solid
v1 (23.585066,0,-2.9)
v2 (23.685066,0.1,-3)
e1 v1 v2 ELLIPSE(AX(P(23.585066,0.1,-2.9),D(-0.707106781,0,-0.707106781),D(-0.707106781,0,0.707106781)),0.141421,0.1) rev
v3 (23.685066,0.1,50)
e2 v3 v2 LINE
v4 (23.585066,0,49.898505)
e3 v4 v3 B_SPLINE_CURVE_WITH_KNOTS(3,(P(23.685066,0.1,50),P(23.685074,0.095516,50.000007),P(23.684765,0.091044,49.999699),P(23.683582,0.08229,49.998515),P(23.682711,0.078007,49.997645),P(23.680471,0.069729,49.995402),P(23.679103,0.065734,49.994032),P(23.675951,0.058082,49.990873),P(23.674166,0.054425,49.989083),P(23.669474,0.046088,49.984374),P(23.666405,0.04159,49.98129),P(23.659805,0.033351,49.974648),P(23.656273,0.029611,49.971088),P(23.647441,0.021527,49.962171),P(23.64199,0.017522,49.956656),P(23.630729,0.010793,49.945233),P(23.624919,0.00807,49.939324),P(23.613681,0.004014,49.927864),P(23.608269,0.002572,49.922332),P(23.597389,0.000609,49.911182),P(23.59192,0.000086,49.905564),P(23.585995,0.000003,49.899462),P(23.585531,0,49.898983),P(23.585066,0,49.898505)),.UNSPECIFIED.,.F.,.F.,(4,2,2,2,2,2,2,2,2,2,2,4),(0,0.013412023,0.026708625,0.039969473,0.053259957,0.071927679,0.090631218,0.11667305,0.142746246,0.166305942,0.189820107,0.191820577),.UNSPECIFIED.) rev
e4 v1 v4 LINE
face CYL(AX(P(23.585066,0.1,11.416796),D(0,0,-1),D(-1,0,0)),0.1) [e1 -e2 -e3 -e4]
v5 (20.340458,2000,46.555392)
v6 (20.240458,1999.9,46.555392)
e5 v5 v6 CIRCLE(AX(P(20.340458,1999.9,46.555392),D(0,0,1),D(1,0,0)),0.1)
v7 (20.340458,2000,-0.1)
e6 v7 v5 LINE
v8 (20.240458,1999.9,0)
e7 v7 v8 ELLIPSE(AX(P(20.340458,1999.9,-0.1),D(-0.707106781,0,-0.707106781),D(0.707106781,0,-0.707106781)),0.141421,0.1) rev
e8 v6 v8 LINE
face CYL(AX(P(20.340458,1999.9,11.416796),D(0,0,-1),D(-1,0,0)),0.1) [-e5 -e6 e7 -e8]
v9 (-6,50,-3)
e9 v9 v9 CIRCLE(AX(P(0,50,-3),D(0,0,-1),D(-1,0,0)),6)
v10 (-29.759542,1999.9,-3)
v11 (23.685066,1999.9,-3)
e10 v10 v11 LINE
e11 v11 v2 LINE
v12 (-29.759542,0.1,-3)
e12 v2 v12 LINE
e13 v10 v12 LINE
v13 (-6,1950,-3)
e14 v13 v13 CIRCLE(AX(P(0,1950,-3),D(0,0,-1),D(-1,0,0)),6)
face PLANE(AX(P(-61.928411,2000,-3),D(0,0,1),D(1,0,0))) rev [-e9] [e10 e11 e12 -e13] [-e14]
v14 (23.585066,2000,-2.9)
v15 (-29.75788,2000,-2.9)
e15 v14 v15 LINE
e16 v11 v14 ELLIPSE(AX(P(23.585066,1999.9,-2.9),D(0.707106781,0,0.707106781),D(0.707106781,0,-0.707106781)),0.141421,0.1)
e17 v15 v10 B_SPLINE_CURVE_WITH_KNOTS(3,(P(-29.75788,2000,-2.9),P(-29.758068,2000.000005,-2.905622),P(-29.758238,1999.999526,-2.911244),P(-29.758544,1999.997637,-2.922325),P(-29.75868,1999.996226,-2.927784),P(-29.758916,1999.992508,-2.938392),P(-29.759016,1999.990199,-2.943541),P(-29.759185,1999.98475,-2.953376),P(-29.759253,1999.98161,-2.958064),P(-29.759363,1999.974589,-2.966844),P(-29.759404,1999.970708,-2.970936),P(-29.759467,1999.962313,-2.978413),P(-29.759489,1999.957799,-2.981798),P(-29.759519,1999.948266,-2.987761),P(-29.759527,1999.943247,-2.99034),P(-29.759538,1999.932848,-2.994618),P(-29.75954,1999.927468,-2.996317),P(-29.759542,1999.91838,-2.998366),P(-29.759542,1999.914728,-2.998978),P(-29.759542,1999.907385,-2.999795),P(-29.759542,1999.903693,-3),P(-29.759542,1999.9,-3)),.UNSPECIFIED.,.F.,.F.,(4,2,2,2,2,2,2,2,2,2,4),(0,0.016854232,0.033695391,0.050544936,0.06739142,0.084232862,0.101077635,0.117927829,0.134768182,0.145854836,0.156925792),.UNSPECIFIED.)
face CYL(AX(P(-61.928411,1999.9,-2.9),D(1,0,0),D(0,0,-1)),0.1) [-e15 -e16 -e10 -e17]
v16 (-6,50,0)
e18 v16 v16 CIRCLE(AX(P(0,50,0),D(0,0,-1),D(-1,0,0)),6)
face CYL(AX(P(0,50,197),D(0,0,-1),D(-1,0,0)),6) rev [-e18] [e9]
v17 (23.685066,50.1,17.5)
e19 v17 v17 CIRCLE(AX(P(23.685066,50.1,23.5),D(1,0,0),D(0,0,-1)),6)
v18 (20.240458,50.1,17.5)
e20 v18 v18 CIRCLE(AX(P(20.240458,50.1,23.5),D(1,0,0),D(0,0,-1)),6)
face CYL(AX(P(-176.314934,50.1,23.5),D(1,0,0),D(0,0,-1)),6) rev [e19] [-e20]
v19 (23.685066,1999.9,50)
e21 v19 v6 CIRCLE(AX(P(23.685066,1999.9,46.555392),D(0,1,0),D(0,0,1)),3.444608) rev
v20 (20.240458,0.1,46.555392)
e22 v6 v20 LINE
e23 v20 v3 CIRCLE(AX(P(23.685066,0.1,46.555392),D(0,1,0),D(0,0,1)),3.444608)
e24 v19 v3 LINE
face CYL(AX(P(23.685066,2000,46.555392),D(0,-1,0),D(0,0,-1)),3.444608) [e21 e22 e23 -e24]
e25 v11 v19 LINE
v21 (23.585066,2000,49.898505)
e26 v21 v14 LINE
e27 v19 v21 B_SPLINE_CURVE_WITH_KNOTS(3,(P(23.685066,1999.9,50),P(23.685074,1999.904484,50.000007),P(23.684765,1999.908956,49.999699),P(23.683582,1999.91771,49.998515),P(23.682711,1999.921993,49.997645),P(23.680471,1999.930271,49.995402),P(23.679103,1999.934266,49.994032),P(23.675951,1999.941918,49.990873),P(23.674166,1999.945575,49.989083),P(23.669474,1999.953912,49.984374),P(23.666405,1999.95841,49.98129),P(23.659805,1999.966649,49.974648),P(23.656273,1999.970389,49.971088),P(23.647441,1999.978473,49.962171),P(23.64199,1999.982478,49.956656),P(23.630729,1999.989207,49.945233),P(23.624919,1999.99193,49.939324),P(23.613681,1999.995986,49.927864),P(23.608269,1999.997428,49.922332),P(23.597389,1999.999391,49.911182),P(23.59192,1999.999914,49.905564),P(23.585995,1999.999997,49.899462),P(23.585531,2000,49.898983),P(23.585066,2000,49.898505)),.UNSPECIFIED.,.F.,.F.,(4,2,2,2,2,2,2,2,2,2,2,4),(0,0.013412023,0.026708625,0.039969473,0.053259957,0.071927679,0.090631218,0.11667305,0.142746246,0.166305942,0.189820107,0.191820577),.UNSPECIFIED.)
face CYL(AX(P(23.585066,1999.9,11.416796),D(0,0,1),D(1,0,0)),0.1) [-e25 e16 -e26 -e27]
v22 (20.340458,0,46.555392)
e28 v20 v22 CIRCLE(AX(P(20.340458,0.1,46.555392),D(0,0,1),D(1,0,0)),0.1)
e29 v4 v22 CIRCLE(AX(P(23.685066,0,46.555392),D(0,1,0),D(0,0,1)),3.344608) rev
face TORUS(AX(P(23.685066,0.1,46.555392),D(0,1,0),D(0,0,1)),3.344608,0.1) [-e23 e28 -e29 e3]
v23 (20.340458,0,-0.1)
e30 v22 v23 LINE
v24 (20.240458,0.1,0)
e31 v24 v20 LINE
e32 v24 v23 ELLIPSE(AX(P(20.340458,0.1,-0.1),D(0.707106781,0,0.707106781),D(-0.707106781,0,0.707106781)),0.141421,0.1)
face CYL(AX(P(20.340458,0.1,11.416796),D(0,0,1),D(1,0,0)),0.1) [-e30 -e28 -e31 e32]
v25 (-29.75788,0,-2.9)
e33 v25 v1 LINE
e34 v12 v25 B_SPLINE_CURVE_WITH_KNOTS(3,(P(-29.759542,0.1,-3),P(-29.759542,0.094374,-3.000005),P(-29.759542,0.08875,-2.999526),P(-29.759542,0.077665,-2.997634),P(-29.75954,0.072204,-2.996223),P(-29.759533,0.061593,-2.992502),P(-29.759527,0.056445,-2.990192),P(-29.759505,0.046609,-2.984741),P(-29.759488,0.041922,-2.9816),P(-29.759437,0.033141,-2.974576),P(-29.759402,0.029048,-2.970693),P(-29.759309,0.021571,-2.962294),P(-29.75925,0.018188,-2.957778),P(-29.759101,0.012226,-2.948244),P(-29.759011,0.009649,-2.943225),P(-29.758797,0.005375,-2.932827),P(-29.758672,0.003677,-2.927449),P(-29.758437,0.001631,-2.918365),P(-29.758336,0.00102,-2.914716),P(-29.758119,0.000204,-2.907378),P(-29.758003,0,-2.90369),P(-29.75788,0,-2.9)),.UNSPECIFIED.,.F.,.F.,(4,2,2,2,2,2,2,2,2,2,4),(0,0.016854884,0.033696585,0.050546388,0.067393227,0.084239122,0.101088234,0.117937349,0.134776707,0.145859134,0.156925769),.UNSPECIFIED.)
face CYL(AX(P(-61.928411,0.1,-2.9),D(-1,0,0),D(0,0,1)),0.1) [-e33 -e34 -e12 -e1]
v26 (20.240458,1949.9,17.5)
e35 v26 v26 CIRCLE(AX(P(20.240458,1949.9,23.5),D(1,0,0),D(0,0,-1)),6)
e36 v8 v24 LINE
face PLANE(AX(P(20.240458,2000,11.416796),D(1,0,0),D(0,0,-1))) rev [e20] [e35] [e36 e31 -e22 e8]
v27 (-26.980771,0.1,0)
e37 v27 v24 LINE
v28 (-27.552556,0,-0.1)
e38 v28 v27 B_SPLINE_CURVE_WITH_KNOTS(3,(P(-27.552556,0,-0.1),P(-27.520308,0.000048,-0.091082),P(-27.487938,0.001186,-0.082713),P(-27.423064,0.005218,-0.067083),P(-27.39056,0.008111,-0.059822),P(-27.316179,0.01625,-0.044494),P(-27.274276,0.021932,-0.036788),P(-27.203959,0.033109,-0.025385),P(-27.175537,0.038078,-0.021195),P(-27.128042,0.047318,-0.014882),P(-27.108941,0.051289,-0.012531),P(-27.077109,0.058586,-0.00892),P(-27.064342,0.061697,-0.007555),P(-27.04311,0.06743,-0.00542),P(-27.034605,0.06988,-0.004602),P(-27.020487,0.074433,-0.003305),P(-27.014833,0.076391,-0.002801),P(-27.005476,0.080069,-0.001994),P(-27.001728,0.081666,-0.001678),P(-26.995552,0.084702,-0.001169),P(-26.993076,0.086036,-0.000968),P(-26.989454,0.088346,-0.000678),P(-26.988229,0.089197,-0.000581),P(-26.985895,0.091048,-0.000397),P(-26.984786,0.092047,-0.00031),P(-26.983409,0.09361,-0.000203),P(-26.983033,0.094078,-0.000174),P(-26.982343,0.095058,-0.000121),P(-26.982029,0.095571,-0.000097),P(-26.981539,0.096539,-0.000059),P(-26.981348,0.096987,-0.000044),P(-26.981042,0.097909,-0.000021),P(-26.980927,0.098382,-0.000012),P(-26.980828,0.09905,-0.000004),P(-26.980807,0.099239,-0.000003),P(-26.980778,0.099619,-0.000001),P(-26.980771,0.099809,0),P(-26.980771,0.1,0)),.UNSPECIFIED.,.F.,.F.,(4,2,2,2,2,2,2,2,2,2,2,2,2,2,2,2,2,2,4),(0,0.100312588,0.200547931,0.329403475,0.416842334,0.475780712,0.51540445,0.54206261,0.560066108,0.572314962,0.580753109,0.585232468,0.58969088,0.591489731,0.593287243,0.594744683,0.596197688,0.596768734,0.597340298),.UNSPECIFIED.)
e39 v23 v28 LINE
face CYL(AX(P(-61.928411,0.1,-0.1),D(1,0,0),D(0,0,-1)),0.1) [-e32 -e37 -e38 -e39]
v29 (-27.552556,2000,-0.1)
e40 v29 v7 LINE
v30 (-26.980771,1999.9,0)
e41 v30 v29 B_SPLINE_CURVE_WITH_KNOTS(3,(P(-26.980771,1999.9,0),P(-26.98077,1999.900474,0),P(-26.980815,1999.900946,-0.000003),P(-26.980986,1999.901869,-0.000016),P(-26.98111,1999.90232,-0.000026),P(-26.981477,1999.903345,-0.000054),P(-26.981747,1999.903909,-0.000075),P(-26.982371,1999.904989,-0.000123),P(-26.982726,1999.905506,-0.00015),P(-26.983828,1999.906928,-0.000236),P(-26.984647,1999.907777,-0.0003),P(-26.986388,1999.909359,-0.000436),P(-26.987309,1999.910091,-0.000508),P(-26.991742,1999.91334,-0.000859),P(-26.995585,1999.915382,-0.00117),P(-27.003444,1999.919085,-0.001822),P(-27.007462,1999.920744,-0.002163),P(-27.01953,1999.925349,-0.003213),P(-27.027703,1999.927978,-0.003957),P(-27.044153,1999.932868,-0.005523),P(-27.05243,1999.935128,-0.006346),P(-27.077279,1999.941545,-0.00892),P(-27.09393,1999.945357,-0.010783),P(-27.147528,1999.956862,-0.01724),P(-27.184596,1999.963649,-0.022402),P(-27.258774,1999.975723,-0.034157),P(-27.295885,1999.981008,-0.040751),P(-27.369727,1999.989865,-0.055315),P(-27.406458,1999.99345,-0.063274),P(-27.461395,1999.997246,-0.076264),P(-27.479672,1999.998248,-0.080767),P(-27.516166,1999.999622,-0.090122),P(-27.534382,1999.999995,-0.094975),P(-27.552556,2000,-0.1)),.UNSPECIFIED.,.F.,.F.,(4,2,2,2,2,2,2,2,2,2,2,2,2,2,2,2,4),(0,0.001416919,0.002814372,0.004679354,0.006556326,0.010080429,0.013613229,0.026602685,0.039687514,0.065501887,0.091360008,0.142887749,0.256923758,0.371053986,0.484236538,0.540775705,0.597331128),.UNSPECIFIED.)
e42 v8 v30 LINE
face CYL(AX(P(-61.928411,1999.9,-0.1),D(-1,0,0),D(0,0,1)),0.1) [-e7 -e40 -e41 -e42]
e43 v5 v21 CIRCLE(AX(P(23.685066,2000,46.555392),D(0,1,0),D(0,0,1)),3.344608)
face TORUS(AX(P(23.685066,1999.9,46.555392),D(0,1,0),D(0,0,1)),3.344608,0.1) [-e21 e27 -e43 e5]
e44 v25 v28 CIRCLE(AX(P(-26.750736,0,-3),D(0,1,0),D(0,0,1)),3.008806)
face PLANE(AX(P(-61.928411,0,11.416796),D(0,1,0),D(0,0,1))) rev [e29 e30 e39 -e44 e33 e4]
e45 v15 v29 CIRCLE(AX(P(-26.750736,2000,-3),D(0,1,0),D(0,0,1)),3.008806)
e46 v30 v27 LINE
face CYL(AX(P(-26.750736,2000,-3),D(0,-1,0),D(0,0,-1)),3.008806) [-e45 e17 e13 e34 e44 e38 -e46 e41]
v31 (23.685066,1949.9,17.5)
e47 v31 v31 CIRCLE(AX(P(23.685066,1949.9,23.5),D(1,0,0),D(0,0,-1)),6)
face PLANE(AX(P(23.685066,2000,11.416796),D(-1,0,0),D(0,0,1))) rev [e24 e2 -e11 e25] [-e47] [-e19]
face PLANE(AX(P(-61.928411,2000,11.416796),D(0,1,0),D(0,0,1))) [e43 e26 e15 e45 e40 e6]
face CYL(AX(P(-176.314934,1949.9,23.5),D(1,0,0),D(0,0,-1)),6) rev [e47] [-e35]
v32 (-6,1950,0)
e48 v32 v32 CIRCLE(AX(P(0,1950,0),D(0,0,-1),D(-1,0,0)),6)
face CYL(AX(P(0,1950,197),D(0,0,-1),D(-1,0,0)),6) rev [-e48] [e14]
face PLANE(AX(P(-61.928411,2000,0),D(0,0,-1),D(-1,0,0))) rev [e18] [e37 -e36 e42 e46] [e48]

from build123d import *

# Parameters (mm, degrees)
EXTRUDE_1_DEPTH        = 2000
FILLET_1_R             = 0.1
SKETCH_2_R             = 6
CUT_EXTRUDE_1_DEPTH    = 200
SKETCH_5_R             = 6
CUT_EXTRUDE_2_DEPTH    = 200
PATTERN_LINEAR_1_COUNT = 2
PATTERN_LINEAR_1_PITCH = 1900


with BuildPart() as part:
    # 草图1 → 凸台-拉伸1 (new body)
    with BuildSketch(Plane(origin=(0, 0, 0), x_dir=(1, 0, 0), z_dir=(0, 1, 0))):
        with BuildLine():
            ThreePointArc((-29.759542218, 3), (-28.958115236, 0.95539927), (-26.980771162, 0))
            Line((-26.980771162, 0), (-26.520700364, 0))
            Line((-26.520700364, 0), (20.240457782, 0))
            Line((20.240457782, 0), (20.240457782, -46.555391571))
            ThreePointArc((20.240457782, -46.555391571), (21.249360232, -48.99109755), (23.68506621, -50))
            Line((23.68506621, -50), (23.68506621, 3))
            Line((23.68506621, 3), (-29.759542218, 3))
        make_face()
    extrude(amount=EXTRUDE_1_DEPTH)

    # 圆角1
    # the kernel refuses this fillet: 0.1 mm, written as the material it takes off along each edge
    with BuildSketch(Plane(origin=(24.28506621, 2000, -3), x_dir=(0, 0, 1), z_dir=(-1, 0, 0))) as fillet_1_piece_1:
        with BuildLine():
            CenterArc((FILLET_1_R, -FILLET_1_R), FILLET_1_R, 90, 90)
            Line((0, -FILLET_1_R), (-FILLET_1_R * 0.02, -FILLET_1_R))
            Line((-FILLET_1_R * 0.02, -FILLET_1_R), (-FILLET_1_R * 0.02, FILLET_1_R * 0.0199999999995))
            Line((-FILLET_1_R * 0.02, FILLET_1_R * 0.0199999999995), (FILLET_1_R, FILLET_1_R * 0.0199999999995))
            Line((FILLET_1_R, FILLET_1_R * 0.0199999999995), (FILLET_1_R, 0))
        make_face()
    extrude(amount=54.644608429, mode=Mode.SUBTRACT)
    with BuildSketch(Plane(origin=(20.240457782, 2000, 0), x_dir=(0, 0, -1), z_dir=(-1, 0, 0)), Plane(origin=(-27.580771162, 0, 0), x_dir=(0, 0, -1), z_dir=(1, 0, 0))) as fillet_1_piece_2:
        with BuildLine():
            CenterArc((FILLET_1_R, FILLET_1_R), FILLET_1_R, 180, 90)
            Line((0, FILLET_1_R), (-FILLET_1_R * 0.02, FILLET_1_R))
            Line((-FILLET_1_R * 0.02, FILLET_1_R), (-FILLET_1_R * 0.02, -FILLET_1_R * 0.0199999999995))
            Line((-FILLET_1_R * 0.02, -FILLET_1_R * 0.0199999999995), (FILLET_1_R, -FILLET_1_R * 0.0199999999995))
            Line((FILLET_1_R, -FILLET_1_R * 0.0199999999995), (FILLET_1_R, 0))
        make_face()
    extrude(amount=47.821228944, mode=Mode.SUBTRACT)
    with BuildSketch(Plane(origin=(20.240457782, 2000, 0), x_dir=(1, 0, 0), z_dir=(0, 0, 1)), Plane(origin=(20.240457782, 0, 0), x_dir=(0, 1, 0), z_dir=(0, 0, 1))) as fillet_1_piece_3:
        with BuildLine():
            CenterArc((FILLET_1_R, -FILLET_1_R), FILLET_1_R, 90, 90)
            Line((0, -FILLET_1_R), (-FILLET_1_R * 0.02, -FILLET_1_R))
            Line((-FILLET_1_R * 0.02, -FILLET_1_R), (-FILLET_1_R * 0.02, FILLET_1_R * 0.0199999999995))
            Line((-FILLET_1_R * 0.02, FILLET_1_R * 0.0199999999995), (FILLET_1_R, FILLET_1_R * 0.0199999999995))
            Line((FILLET_1_R, FILLET_1_R * 0.0199999999995), (FILLET_1_R, 0))
        make_face()
    extrude(amount=46.555391571, mode=Mode.SUBTRACT)
    with BuildSketch(Plane(origin=(23.68506621, 2000, 46.555391571), x_dir=(-1, 0, 0), z_dir=(0, 0, -1))) as fillet_1_piece_4:
        with BuildLine():
            CenterArc((3.444608429 - FILLET_1_R, -FILLET_1_R), FILLET_1_R, 0, 90)
            Line((3.444608429, -FILLET_1_R), (3.444608429 + FILLET_1_R * 0.02, -FILLET_1_R))
            Line((3.444608429 + FILLET_1_R * 0.02, -FILLET_1_R), (3.444608429 + FILLET_1_R * 0.02, FILLET_1_R * 0.0199999999995))
            Line((3.444608429 + FILLET_1_R * 0.02, FILLET_1_R * 0.0199999999995), (3.444608429 - FILLET_1_R, FILLET_1_R * 0.0199999999995))
            Line((3.444608429 - FILLET_1_R, FILLET_1_R * 0.0199999999995), (3.444608429 - FILLET_1_R, 0))
        make_face()
    revolve(axis=Axis((23.68506621, 2000, 46.555391571), (0, 1, 0)), revolution_arc=99.984089086, mode=Mode.SUBTRACT)
    with BuildSketch(Plane(origin=(24.28506621, 0, -3), x_dir=(0, 0, 1), z_dir=(-1, 0, 0))) as fillet_1_piece_5:
        with BuildLine():
            CenterArc((FILLET_1_R, FILLET_1_R), FILLET_1_R, 180, 90)
            Line((0, FILLET_1_R), (-FILLET_1_R * 0.02, FILLET_1_R))
            Line((-FILLET_1_R * 0.02, FILLET_1_R), (-FILLET_1_R * 0.02, -FILLET_1_R * 0.02))
            Line((-FILLET_1_R * 0.02, -FILLET_1_R * 0.02), (FILLET_1_R, -FILLET_1_R * 0.02))
            Line((FILLET_1_R, -FILLET_1_R * 0.02), (FILLET_1_R, 0))
        make_face()
    extrude(amount=54.644608429, mode=Mode.SUBTRACT)
    with BuildSketch(Plane(origin=(23.68506621, 2000, 50.6), x_dir=(-1, 0, 0), z_dir=(0, 0, -1)), Plane(origin=(23.68506621, 0, 50.6), x_dir=(0, 1, 0), z_dir=(0, 0, -1))) as fillet_1_piece_6:
        with BuildLine():
            CenterArc((FILLET_1_R, -FILLET_1_R), FILLET_1_R, 90, 90)
            Line((0, -FILLET_1_R), (-FILLET_1_R * 0.02, -FILLET_1_R))
            Line((-FILLET_1_R * 0.02, -FILLET_1_R), (-FILLET_1_R * 0.02, FILLET_1_R * 0.0199999999995))
            Line((-FILLET_1_R * 0.02, FILLET_1_R * 0.0199999999995), (FILLET_1_R, FILLET_1_R * 0.0199999999995))
            Line((FILLET_1_R, FILLET_1_R * 0.0199999999995), (FILLET_1_R, 0))
        make_face()
    extrude(amount=54.2, mode=Mode.SUBTRACT)
    with BuildSketch(Plane(origin=(23.68506621, 0, 46.555391571), x_dir=(-1, 0, 0), z_dir=(0, 0, -1))) as fillet_1_piece_7:
        with BuildLine():
            CenterArc((3.444608429 - FILLET_1_R, FILLET_1_R), FILLET_1_R, 270, 90)
            Line((3.444608429 - FILLET_1_R, 0), (3.444608429 - FILLET_1_R, -FILLET_1_R * 0.02))
            Line((3.444608429 - FILLET_1_R, -FILLET_1_R * 0.02), (3.444608429 + FILLET_1_R * 0.02, -FILLET_1_R * 0.02))
            Line((3.444608429 + FILLET_1_R * 0.02, -FILLET_1_R * 0.02), (3.444608429 + FILLET_1_R * 0.02, FILLET_1_R))
            Line((3.444608429 + FILLET_1_R * 0.02, FILLET_1_R), (3.444608429, FILLET_1_R))
        make_face()
    revolve(axis=Axis((23.68506621, 0, 46.555391571), (0, 1, 0)), revolution_arc=99.984089086, mode=Mode.SUBTRACT)
    with BuildSketch(Plane(origin=(20.840457782, 2000, 0), x_dir=(0, 0, -1), z_dir=(-1, 0, 0))) as fillet_1_piece_8a_section:
        with BuildLine():
            CenterArc((FILLET_1_R, FILLET_1_R), FILLET_1_R, 180, 90)
            Line((0, FILLET_1_R), (-FILLET_1_R * 0.02, FILLET_1_R))
            Line((-FILLET_1_R * 0.02, FILLET_1_R), (-FILLET_1_R * 0.02, -FILLET_1_R * 0.0199999999995))
            Line((-FILLET_1_R * 0.02, -FILLET_1_R * 0.0199999999995), (FILLET_1_R, -FILLET_1_R * 0.0199999999995))
            Line((FILLET_1_R, -FILLET_1_R * 0.0199999999995), (FILLET_1_R, 0))
        make_face()
    fillet_1_piece_8a = extrude(amount=48.421228944, mode=Mode.PRIVATE)
    fillet_1_piece_8a = split(fillet_1_piece_8a, bisect_by=Plane(origin=(20.240457782, 1999.977360489, -0.022639511), z_dir=(1, 0, 0)), keep=Keep.TOP, mode=Mode.PRIVATE)
    with BuildSketch(Plane(origin=(20.240457782, 2000, -0.6), x_dir=(1, 0, 0), z_dir=(0, 0, 1))) as fillet_1_piece_8b_section:
        with BuildLine():
            CenterArc((FILLET_1_R, -FILLET_1_R), FILLET_1_R, 90, 90)
            Line((0, -FILLET_1_R), (-FILLET_1_R * 0.02, -FILLET_1_R))
            Line((-FILLET_1_R * 0.02, -FILLET_1_R), (-FILLET_1_R * 0.02, FILLET_1_R * 0.0199999999995))
            Line((-FILLET_1_R * 0.02, FILLET_1_R * 0.0199999999995), (FILLET_1_R, FILLET_1_R * 0.0199999999995))
            Line((FILLET_1_R, FILLET_1_R * 0.0199999999995), (FILLET_1_R, 0))
        make_face()
    fillet_1_piece_8b = extrude(amount=47.155391571, mode=Mode.PRIVATE)
    fillet_1_piece_8b = split(fillet_1_piece_8b, bisect_by=Plane(origin=(20.263097293, 1999.977360489, 0), z_dir=(0, 0, -1)), keep=Keep.TOP, mode=Mode.PRIVATE)
    fillet_1_piece_8 = fillet_1_piece_8a & fillet_1_piece_8b
    add(fillet_1_piece_8, mode=Mode.SUBTRACT)
    with BuildSketch(Plane(origin=(20.240457782, 0, -0.6), x_dir=(0, 1, 0), z_dir=(0, 0, 1))) as fillet_1_piece_9a_section:
        with BuildLine():
            CenterArc((FILLET_1_R, -FILLET_1_R), FILLET_1_R, 90, 90)
            Line((0, -FILLET_1_R), (-FILLET_1_R * 0.02, -FILLET_1_R))
            Line((-FILLET_1_R * 0.02, -FILLET_1_R), (-FILLET_1_R * 0.02, FILLET_1_R * 0.02))
            Line((-FILLET_1_R * 0.02, FILLET_1_R * 0.02), (FILLET_1_R, FILLET_1_R * 0.02))
            Line((FILLET_1_R, FILLET_1_R * 0.02), (FILLET_1_R, 0))
        make_face()
    fillet_1_piece_9a = extrude(amount=47.155391571, mode=Mode.PRIVATE)
    fillet_1_piece_9a = split(fillet_1_piece_9a, bisect_by=Plane(origin=(20.263097293, 0.022639511, 0), z_dir=(0, 0, -1)), keep=Keep.TOP, mode=Mode.PRIVATE)
    with BuildSketch(Plane(origin=(-27.580771162, 0, 0), x_dir=(0, 0, -1), z_dir=(1, 0, 0))) as fillet_1_piece_9b_section:
        with BuildLine():
            CenterArc((FILLET_1_R, FILLET_1_R), FILLET_1_R, 180, 90)
            Line((0, FILLET_1_R), (-FILLET_1_R * 0.02, FILLET_1_R))
            Line((-FILLET_1_R * 0.02, FILLET_1_R), (-FILLET_1_R * 0.02, -FILLET_1_R * 0.02))
            Line((-FILLET_1_R * 0.02, -FILLET_1_R * 0.02), (FILLET_1_R, -FILLET_1_R * 0.02))
            Line((FILLET_1_R, -FILLET_1_R * 0.02), (FILLET_1_R, 0))
        make_face()
    fillet_1_piece_9b = extrude(amount=48.421228944, mode=Mode.PRIVATE)
    fillet_1_piece_9b = split(fillet_1_piece_9b, bisect_by=Plane(origin=(20.240457782, 0.022639511, -0.022639511), z_dir=(1, 0, 0)), keep=Keep.TOP, mode=Mode.PRIVATE)
    fillet_1_piece_9 = fillet_1_piece_9a & fillet_1_piece_9b
    add(fillet_1_piece_9, mode=Mode.SUBTRACT)

    # 草图2 → 切除-拉伸1 (cut)
    with BuildSketch(Plane(origin=(23.68506621, 0, 0), x_dir=(0, 0, -1), z_dir=(1, 0, 0))):
        with Locations((-23.5, 50.1)):
            Circle(SKETCH_2_R)
        with Locations((-23.5, 1949.9)):
            Circle(SKETCH_2_R)
    extrude(amount=-CUT_EXTRUDE_1_DEPTH, mode=Mode.SUBTRACT)

    # 草图5 → 切除-拉伸2 (cut)
    with BuildSketch(Plane(origin=(0, 0, -3), x_dir=(-1, 0, 0), z_dir=(0, 0, -1))):
        with Locations((0, 50)):
            Circle(SKETCH_5_R)
    cut_extrude_2 = extrude(amount=-CUT_EXTRUDE_2_DEPTH, mode=Mode.SUBTRACT)

    # 阵列(线性)1: 切除-拉伸2 ×2
    with Locations(*[(0, i * PATTERN_LINEAR_1_PITCH, 0) for i in range(1, PATTERN_LINEAR_1_COUNT)]):
        add(cut_extrude_2, mode=Mode.SUBTRACT)


solid = part.part
